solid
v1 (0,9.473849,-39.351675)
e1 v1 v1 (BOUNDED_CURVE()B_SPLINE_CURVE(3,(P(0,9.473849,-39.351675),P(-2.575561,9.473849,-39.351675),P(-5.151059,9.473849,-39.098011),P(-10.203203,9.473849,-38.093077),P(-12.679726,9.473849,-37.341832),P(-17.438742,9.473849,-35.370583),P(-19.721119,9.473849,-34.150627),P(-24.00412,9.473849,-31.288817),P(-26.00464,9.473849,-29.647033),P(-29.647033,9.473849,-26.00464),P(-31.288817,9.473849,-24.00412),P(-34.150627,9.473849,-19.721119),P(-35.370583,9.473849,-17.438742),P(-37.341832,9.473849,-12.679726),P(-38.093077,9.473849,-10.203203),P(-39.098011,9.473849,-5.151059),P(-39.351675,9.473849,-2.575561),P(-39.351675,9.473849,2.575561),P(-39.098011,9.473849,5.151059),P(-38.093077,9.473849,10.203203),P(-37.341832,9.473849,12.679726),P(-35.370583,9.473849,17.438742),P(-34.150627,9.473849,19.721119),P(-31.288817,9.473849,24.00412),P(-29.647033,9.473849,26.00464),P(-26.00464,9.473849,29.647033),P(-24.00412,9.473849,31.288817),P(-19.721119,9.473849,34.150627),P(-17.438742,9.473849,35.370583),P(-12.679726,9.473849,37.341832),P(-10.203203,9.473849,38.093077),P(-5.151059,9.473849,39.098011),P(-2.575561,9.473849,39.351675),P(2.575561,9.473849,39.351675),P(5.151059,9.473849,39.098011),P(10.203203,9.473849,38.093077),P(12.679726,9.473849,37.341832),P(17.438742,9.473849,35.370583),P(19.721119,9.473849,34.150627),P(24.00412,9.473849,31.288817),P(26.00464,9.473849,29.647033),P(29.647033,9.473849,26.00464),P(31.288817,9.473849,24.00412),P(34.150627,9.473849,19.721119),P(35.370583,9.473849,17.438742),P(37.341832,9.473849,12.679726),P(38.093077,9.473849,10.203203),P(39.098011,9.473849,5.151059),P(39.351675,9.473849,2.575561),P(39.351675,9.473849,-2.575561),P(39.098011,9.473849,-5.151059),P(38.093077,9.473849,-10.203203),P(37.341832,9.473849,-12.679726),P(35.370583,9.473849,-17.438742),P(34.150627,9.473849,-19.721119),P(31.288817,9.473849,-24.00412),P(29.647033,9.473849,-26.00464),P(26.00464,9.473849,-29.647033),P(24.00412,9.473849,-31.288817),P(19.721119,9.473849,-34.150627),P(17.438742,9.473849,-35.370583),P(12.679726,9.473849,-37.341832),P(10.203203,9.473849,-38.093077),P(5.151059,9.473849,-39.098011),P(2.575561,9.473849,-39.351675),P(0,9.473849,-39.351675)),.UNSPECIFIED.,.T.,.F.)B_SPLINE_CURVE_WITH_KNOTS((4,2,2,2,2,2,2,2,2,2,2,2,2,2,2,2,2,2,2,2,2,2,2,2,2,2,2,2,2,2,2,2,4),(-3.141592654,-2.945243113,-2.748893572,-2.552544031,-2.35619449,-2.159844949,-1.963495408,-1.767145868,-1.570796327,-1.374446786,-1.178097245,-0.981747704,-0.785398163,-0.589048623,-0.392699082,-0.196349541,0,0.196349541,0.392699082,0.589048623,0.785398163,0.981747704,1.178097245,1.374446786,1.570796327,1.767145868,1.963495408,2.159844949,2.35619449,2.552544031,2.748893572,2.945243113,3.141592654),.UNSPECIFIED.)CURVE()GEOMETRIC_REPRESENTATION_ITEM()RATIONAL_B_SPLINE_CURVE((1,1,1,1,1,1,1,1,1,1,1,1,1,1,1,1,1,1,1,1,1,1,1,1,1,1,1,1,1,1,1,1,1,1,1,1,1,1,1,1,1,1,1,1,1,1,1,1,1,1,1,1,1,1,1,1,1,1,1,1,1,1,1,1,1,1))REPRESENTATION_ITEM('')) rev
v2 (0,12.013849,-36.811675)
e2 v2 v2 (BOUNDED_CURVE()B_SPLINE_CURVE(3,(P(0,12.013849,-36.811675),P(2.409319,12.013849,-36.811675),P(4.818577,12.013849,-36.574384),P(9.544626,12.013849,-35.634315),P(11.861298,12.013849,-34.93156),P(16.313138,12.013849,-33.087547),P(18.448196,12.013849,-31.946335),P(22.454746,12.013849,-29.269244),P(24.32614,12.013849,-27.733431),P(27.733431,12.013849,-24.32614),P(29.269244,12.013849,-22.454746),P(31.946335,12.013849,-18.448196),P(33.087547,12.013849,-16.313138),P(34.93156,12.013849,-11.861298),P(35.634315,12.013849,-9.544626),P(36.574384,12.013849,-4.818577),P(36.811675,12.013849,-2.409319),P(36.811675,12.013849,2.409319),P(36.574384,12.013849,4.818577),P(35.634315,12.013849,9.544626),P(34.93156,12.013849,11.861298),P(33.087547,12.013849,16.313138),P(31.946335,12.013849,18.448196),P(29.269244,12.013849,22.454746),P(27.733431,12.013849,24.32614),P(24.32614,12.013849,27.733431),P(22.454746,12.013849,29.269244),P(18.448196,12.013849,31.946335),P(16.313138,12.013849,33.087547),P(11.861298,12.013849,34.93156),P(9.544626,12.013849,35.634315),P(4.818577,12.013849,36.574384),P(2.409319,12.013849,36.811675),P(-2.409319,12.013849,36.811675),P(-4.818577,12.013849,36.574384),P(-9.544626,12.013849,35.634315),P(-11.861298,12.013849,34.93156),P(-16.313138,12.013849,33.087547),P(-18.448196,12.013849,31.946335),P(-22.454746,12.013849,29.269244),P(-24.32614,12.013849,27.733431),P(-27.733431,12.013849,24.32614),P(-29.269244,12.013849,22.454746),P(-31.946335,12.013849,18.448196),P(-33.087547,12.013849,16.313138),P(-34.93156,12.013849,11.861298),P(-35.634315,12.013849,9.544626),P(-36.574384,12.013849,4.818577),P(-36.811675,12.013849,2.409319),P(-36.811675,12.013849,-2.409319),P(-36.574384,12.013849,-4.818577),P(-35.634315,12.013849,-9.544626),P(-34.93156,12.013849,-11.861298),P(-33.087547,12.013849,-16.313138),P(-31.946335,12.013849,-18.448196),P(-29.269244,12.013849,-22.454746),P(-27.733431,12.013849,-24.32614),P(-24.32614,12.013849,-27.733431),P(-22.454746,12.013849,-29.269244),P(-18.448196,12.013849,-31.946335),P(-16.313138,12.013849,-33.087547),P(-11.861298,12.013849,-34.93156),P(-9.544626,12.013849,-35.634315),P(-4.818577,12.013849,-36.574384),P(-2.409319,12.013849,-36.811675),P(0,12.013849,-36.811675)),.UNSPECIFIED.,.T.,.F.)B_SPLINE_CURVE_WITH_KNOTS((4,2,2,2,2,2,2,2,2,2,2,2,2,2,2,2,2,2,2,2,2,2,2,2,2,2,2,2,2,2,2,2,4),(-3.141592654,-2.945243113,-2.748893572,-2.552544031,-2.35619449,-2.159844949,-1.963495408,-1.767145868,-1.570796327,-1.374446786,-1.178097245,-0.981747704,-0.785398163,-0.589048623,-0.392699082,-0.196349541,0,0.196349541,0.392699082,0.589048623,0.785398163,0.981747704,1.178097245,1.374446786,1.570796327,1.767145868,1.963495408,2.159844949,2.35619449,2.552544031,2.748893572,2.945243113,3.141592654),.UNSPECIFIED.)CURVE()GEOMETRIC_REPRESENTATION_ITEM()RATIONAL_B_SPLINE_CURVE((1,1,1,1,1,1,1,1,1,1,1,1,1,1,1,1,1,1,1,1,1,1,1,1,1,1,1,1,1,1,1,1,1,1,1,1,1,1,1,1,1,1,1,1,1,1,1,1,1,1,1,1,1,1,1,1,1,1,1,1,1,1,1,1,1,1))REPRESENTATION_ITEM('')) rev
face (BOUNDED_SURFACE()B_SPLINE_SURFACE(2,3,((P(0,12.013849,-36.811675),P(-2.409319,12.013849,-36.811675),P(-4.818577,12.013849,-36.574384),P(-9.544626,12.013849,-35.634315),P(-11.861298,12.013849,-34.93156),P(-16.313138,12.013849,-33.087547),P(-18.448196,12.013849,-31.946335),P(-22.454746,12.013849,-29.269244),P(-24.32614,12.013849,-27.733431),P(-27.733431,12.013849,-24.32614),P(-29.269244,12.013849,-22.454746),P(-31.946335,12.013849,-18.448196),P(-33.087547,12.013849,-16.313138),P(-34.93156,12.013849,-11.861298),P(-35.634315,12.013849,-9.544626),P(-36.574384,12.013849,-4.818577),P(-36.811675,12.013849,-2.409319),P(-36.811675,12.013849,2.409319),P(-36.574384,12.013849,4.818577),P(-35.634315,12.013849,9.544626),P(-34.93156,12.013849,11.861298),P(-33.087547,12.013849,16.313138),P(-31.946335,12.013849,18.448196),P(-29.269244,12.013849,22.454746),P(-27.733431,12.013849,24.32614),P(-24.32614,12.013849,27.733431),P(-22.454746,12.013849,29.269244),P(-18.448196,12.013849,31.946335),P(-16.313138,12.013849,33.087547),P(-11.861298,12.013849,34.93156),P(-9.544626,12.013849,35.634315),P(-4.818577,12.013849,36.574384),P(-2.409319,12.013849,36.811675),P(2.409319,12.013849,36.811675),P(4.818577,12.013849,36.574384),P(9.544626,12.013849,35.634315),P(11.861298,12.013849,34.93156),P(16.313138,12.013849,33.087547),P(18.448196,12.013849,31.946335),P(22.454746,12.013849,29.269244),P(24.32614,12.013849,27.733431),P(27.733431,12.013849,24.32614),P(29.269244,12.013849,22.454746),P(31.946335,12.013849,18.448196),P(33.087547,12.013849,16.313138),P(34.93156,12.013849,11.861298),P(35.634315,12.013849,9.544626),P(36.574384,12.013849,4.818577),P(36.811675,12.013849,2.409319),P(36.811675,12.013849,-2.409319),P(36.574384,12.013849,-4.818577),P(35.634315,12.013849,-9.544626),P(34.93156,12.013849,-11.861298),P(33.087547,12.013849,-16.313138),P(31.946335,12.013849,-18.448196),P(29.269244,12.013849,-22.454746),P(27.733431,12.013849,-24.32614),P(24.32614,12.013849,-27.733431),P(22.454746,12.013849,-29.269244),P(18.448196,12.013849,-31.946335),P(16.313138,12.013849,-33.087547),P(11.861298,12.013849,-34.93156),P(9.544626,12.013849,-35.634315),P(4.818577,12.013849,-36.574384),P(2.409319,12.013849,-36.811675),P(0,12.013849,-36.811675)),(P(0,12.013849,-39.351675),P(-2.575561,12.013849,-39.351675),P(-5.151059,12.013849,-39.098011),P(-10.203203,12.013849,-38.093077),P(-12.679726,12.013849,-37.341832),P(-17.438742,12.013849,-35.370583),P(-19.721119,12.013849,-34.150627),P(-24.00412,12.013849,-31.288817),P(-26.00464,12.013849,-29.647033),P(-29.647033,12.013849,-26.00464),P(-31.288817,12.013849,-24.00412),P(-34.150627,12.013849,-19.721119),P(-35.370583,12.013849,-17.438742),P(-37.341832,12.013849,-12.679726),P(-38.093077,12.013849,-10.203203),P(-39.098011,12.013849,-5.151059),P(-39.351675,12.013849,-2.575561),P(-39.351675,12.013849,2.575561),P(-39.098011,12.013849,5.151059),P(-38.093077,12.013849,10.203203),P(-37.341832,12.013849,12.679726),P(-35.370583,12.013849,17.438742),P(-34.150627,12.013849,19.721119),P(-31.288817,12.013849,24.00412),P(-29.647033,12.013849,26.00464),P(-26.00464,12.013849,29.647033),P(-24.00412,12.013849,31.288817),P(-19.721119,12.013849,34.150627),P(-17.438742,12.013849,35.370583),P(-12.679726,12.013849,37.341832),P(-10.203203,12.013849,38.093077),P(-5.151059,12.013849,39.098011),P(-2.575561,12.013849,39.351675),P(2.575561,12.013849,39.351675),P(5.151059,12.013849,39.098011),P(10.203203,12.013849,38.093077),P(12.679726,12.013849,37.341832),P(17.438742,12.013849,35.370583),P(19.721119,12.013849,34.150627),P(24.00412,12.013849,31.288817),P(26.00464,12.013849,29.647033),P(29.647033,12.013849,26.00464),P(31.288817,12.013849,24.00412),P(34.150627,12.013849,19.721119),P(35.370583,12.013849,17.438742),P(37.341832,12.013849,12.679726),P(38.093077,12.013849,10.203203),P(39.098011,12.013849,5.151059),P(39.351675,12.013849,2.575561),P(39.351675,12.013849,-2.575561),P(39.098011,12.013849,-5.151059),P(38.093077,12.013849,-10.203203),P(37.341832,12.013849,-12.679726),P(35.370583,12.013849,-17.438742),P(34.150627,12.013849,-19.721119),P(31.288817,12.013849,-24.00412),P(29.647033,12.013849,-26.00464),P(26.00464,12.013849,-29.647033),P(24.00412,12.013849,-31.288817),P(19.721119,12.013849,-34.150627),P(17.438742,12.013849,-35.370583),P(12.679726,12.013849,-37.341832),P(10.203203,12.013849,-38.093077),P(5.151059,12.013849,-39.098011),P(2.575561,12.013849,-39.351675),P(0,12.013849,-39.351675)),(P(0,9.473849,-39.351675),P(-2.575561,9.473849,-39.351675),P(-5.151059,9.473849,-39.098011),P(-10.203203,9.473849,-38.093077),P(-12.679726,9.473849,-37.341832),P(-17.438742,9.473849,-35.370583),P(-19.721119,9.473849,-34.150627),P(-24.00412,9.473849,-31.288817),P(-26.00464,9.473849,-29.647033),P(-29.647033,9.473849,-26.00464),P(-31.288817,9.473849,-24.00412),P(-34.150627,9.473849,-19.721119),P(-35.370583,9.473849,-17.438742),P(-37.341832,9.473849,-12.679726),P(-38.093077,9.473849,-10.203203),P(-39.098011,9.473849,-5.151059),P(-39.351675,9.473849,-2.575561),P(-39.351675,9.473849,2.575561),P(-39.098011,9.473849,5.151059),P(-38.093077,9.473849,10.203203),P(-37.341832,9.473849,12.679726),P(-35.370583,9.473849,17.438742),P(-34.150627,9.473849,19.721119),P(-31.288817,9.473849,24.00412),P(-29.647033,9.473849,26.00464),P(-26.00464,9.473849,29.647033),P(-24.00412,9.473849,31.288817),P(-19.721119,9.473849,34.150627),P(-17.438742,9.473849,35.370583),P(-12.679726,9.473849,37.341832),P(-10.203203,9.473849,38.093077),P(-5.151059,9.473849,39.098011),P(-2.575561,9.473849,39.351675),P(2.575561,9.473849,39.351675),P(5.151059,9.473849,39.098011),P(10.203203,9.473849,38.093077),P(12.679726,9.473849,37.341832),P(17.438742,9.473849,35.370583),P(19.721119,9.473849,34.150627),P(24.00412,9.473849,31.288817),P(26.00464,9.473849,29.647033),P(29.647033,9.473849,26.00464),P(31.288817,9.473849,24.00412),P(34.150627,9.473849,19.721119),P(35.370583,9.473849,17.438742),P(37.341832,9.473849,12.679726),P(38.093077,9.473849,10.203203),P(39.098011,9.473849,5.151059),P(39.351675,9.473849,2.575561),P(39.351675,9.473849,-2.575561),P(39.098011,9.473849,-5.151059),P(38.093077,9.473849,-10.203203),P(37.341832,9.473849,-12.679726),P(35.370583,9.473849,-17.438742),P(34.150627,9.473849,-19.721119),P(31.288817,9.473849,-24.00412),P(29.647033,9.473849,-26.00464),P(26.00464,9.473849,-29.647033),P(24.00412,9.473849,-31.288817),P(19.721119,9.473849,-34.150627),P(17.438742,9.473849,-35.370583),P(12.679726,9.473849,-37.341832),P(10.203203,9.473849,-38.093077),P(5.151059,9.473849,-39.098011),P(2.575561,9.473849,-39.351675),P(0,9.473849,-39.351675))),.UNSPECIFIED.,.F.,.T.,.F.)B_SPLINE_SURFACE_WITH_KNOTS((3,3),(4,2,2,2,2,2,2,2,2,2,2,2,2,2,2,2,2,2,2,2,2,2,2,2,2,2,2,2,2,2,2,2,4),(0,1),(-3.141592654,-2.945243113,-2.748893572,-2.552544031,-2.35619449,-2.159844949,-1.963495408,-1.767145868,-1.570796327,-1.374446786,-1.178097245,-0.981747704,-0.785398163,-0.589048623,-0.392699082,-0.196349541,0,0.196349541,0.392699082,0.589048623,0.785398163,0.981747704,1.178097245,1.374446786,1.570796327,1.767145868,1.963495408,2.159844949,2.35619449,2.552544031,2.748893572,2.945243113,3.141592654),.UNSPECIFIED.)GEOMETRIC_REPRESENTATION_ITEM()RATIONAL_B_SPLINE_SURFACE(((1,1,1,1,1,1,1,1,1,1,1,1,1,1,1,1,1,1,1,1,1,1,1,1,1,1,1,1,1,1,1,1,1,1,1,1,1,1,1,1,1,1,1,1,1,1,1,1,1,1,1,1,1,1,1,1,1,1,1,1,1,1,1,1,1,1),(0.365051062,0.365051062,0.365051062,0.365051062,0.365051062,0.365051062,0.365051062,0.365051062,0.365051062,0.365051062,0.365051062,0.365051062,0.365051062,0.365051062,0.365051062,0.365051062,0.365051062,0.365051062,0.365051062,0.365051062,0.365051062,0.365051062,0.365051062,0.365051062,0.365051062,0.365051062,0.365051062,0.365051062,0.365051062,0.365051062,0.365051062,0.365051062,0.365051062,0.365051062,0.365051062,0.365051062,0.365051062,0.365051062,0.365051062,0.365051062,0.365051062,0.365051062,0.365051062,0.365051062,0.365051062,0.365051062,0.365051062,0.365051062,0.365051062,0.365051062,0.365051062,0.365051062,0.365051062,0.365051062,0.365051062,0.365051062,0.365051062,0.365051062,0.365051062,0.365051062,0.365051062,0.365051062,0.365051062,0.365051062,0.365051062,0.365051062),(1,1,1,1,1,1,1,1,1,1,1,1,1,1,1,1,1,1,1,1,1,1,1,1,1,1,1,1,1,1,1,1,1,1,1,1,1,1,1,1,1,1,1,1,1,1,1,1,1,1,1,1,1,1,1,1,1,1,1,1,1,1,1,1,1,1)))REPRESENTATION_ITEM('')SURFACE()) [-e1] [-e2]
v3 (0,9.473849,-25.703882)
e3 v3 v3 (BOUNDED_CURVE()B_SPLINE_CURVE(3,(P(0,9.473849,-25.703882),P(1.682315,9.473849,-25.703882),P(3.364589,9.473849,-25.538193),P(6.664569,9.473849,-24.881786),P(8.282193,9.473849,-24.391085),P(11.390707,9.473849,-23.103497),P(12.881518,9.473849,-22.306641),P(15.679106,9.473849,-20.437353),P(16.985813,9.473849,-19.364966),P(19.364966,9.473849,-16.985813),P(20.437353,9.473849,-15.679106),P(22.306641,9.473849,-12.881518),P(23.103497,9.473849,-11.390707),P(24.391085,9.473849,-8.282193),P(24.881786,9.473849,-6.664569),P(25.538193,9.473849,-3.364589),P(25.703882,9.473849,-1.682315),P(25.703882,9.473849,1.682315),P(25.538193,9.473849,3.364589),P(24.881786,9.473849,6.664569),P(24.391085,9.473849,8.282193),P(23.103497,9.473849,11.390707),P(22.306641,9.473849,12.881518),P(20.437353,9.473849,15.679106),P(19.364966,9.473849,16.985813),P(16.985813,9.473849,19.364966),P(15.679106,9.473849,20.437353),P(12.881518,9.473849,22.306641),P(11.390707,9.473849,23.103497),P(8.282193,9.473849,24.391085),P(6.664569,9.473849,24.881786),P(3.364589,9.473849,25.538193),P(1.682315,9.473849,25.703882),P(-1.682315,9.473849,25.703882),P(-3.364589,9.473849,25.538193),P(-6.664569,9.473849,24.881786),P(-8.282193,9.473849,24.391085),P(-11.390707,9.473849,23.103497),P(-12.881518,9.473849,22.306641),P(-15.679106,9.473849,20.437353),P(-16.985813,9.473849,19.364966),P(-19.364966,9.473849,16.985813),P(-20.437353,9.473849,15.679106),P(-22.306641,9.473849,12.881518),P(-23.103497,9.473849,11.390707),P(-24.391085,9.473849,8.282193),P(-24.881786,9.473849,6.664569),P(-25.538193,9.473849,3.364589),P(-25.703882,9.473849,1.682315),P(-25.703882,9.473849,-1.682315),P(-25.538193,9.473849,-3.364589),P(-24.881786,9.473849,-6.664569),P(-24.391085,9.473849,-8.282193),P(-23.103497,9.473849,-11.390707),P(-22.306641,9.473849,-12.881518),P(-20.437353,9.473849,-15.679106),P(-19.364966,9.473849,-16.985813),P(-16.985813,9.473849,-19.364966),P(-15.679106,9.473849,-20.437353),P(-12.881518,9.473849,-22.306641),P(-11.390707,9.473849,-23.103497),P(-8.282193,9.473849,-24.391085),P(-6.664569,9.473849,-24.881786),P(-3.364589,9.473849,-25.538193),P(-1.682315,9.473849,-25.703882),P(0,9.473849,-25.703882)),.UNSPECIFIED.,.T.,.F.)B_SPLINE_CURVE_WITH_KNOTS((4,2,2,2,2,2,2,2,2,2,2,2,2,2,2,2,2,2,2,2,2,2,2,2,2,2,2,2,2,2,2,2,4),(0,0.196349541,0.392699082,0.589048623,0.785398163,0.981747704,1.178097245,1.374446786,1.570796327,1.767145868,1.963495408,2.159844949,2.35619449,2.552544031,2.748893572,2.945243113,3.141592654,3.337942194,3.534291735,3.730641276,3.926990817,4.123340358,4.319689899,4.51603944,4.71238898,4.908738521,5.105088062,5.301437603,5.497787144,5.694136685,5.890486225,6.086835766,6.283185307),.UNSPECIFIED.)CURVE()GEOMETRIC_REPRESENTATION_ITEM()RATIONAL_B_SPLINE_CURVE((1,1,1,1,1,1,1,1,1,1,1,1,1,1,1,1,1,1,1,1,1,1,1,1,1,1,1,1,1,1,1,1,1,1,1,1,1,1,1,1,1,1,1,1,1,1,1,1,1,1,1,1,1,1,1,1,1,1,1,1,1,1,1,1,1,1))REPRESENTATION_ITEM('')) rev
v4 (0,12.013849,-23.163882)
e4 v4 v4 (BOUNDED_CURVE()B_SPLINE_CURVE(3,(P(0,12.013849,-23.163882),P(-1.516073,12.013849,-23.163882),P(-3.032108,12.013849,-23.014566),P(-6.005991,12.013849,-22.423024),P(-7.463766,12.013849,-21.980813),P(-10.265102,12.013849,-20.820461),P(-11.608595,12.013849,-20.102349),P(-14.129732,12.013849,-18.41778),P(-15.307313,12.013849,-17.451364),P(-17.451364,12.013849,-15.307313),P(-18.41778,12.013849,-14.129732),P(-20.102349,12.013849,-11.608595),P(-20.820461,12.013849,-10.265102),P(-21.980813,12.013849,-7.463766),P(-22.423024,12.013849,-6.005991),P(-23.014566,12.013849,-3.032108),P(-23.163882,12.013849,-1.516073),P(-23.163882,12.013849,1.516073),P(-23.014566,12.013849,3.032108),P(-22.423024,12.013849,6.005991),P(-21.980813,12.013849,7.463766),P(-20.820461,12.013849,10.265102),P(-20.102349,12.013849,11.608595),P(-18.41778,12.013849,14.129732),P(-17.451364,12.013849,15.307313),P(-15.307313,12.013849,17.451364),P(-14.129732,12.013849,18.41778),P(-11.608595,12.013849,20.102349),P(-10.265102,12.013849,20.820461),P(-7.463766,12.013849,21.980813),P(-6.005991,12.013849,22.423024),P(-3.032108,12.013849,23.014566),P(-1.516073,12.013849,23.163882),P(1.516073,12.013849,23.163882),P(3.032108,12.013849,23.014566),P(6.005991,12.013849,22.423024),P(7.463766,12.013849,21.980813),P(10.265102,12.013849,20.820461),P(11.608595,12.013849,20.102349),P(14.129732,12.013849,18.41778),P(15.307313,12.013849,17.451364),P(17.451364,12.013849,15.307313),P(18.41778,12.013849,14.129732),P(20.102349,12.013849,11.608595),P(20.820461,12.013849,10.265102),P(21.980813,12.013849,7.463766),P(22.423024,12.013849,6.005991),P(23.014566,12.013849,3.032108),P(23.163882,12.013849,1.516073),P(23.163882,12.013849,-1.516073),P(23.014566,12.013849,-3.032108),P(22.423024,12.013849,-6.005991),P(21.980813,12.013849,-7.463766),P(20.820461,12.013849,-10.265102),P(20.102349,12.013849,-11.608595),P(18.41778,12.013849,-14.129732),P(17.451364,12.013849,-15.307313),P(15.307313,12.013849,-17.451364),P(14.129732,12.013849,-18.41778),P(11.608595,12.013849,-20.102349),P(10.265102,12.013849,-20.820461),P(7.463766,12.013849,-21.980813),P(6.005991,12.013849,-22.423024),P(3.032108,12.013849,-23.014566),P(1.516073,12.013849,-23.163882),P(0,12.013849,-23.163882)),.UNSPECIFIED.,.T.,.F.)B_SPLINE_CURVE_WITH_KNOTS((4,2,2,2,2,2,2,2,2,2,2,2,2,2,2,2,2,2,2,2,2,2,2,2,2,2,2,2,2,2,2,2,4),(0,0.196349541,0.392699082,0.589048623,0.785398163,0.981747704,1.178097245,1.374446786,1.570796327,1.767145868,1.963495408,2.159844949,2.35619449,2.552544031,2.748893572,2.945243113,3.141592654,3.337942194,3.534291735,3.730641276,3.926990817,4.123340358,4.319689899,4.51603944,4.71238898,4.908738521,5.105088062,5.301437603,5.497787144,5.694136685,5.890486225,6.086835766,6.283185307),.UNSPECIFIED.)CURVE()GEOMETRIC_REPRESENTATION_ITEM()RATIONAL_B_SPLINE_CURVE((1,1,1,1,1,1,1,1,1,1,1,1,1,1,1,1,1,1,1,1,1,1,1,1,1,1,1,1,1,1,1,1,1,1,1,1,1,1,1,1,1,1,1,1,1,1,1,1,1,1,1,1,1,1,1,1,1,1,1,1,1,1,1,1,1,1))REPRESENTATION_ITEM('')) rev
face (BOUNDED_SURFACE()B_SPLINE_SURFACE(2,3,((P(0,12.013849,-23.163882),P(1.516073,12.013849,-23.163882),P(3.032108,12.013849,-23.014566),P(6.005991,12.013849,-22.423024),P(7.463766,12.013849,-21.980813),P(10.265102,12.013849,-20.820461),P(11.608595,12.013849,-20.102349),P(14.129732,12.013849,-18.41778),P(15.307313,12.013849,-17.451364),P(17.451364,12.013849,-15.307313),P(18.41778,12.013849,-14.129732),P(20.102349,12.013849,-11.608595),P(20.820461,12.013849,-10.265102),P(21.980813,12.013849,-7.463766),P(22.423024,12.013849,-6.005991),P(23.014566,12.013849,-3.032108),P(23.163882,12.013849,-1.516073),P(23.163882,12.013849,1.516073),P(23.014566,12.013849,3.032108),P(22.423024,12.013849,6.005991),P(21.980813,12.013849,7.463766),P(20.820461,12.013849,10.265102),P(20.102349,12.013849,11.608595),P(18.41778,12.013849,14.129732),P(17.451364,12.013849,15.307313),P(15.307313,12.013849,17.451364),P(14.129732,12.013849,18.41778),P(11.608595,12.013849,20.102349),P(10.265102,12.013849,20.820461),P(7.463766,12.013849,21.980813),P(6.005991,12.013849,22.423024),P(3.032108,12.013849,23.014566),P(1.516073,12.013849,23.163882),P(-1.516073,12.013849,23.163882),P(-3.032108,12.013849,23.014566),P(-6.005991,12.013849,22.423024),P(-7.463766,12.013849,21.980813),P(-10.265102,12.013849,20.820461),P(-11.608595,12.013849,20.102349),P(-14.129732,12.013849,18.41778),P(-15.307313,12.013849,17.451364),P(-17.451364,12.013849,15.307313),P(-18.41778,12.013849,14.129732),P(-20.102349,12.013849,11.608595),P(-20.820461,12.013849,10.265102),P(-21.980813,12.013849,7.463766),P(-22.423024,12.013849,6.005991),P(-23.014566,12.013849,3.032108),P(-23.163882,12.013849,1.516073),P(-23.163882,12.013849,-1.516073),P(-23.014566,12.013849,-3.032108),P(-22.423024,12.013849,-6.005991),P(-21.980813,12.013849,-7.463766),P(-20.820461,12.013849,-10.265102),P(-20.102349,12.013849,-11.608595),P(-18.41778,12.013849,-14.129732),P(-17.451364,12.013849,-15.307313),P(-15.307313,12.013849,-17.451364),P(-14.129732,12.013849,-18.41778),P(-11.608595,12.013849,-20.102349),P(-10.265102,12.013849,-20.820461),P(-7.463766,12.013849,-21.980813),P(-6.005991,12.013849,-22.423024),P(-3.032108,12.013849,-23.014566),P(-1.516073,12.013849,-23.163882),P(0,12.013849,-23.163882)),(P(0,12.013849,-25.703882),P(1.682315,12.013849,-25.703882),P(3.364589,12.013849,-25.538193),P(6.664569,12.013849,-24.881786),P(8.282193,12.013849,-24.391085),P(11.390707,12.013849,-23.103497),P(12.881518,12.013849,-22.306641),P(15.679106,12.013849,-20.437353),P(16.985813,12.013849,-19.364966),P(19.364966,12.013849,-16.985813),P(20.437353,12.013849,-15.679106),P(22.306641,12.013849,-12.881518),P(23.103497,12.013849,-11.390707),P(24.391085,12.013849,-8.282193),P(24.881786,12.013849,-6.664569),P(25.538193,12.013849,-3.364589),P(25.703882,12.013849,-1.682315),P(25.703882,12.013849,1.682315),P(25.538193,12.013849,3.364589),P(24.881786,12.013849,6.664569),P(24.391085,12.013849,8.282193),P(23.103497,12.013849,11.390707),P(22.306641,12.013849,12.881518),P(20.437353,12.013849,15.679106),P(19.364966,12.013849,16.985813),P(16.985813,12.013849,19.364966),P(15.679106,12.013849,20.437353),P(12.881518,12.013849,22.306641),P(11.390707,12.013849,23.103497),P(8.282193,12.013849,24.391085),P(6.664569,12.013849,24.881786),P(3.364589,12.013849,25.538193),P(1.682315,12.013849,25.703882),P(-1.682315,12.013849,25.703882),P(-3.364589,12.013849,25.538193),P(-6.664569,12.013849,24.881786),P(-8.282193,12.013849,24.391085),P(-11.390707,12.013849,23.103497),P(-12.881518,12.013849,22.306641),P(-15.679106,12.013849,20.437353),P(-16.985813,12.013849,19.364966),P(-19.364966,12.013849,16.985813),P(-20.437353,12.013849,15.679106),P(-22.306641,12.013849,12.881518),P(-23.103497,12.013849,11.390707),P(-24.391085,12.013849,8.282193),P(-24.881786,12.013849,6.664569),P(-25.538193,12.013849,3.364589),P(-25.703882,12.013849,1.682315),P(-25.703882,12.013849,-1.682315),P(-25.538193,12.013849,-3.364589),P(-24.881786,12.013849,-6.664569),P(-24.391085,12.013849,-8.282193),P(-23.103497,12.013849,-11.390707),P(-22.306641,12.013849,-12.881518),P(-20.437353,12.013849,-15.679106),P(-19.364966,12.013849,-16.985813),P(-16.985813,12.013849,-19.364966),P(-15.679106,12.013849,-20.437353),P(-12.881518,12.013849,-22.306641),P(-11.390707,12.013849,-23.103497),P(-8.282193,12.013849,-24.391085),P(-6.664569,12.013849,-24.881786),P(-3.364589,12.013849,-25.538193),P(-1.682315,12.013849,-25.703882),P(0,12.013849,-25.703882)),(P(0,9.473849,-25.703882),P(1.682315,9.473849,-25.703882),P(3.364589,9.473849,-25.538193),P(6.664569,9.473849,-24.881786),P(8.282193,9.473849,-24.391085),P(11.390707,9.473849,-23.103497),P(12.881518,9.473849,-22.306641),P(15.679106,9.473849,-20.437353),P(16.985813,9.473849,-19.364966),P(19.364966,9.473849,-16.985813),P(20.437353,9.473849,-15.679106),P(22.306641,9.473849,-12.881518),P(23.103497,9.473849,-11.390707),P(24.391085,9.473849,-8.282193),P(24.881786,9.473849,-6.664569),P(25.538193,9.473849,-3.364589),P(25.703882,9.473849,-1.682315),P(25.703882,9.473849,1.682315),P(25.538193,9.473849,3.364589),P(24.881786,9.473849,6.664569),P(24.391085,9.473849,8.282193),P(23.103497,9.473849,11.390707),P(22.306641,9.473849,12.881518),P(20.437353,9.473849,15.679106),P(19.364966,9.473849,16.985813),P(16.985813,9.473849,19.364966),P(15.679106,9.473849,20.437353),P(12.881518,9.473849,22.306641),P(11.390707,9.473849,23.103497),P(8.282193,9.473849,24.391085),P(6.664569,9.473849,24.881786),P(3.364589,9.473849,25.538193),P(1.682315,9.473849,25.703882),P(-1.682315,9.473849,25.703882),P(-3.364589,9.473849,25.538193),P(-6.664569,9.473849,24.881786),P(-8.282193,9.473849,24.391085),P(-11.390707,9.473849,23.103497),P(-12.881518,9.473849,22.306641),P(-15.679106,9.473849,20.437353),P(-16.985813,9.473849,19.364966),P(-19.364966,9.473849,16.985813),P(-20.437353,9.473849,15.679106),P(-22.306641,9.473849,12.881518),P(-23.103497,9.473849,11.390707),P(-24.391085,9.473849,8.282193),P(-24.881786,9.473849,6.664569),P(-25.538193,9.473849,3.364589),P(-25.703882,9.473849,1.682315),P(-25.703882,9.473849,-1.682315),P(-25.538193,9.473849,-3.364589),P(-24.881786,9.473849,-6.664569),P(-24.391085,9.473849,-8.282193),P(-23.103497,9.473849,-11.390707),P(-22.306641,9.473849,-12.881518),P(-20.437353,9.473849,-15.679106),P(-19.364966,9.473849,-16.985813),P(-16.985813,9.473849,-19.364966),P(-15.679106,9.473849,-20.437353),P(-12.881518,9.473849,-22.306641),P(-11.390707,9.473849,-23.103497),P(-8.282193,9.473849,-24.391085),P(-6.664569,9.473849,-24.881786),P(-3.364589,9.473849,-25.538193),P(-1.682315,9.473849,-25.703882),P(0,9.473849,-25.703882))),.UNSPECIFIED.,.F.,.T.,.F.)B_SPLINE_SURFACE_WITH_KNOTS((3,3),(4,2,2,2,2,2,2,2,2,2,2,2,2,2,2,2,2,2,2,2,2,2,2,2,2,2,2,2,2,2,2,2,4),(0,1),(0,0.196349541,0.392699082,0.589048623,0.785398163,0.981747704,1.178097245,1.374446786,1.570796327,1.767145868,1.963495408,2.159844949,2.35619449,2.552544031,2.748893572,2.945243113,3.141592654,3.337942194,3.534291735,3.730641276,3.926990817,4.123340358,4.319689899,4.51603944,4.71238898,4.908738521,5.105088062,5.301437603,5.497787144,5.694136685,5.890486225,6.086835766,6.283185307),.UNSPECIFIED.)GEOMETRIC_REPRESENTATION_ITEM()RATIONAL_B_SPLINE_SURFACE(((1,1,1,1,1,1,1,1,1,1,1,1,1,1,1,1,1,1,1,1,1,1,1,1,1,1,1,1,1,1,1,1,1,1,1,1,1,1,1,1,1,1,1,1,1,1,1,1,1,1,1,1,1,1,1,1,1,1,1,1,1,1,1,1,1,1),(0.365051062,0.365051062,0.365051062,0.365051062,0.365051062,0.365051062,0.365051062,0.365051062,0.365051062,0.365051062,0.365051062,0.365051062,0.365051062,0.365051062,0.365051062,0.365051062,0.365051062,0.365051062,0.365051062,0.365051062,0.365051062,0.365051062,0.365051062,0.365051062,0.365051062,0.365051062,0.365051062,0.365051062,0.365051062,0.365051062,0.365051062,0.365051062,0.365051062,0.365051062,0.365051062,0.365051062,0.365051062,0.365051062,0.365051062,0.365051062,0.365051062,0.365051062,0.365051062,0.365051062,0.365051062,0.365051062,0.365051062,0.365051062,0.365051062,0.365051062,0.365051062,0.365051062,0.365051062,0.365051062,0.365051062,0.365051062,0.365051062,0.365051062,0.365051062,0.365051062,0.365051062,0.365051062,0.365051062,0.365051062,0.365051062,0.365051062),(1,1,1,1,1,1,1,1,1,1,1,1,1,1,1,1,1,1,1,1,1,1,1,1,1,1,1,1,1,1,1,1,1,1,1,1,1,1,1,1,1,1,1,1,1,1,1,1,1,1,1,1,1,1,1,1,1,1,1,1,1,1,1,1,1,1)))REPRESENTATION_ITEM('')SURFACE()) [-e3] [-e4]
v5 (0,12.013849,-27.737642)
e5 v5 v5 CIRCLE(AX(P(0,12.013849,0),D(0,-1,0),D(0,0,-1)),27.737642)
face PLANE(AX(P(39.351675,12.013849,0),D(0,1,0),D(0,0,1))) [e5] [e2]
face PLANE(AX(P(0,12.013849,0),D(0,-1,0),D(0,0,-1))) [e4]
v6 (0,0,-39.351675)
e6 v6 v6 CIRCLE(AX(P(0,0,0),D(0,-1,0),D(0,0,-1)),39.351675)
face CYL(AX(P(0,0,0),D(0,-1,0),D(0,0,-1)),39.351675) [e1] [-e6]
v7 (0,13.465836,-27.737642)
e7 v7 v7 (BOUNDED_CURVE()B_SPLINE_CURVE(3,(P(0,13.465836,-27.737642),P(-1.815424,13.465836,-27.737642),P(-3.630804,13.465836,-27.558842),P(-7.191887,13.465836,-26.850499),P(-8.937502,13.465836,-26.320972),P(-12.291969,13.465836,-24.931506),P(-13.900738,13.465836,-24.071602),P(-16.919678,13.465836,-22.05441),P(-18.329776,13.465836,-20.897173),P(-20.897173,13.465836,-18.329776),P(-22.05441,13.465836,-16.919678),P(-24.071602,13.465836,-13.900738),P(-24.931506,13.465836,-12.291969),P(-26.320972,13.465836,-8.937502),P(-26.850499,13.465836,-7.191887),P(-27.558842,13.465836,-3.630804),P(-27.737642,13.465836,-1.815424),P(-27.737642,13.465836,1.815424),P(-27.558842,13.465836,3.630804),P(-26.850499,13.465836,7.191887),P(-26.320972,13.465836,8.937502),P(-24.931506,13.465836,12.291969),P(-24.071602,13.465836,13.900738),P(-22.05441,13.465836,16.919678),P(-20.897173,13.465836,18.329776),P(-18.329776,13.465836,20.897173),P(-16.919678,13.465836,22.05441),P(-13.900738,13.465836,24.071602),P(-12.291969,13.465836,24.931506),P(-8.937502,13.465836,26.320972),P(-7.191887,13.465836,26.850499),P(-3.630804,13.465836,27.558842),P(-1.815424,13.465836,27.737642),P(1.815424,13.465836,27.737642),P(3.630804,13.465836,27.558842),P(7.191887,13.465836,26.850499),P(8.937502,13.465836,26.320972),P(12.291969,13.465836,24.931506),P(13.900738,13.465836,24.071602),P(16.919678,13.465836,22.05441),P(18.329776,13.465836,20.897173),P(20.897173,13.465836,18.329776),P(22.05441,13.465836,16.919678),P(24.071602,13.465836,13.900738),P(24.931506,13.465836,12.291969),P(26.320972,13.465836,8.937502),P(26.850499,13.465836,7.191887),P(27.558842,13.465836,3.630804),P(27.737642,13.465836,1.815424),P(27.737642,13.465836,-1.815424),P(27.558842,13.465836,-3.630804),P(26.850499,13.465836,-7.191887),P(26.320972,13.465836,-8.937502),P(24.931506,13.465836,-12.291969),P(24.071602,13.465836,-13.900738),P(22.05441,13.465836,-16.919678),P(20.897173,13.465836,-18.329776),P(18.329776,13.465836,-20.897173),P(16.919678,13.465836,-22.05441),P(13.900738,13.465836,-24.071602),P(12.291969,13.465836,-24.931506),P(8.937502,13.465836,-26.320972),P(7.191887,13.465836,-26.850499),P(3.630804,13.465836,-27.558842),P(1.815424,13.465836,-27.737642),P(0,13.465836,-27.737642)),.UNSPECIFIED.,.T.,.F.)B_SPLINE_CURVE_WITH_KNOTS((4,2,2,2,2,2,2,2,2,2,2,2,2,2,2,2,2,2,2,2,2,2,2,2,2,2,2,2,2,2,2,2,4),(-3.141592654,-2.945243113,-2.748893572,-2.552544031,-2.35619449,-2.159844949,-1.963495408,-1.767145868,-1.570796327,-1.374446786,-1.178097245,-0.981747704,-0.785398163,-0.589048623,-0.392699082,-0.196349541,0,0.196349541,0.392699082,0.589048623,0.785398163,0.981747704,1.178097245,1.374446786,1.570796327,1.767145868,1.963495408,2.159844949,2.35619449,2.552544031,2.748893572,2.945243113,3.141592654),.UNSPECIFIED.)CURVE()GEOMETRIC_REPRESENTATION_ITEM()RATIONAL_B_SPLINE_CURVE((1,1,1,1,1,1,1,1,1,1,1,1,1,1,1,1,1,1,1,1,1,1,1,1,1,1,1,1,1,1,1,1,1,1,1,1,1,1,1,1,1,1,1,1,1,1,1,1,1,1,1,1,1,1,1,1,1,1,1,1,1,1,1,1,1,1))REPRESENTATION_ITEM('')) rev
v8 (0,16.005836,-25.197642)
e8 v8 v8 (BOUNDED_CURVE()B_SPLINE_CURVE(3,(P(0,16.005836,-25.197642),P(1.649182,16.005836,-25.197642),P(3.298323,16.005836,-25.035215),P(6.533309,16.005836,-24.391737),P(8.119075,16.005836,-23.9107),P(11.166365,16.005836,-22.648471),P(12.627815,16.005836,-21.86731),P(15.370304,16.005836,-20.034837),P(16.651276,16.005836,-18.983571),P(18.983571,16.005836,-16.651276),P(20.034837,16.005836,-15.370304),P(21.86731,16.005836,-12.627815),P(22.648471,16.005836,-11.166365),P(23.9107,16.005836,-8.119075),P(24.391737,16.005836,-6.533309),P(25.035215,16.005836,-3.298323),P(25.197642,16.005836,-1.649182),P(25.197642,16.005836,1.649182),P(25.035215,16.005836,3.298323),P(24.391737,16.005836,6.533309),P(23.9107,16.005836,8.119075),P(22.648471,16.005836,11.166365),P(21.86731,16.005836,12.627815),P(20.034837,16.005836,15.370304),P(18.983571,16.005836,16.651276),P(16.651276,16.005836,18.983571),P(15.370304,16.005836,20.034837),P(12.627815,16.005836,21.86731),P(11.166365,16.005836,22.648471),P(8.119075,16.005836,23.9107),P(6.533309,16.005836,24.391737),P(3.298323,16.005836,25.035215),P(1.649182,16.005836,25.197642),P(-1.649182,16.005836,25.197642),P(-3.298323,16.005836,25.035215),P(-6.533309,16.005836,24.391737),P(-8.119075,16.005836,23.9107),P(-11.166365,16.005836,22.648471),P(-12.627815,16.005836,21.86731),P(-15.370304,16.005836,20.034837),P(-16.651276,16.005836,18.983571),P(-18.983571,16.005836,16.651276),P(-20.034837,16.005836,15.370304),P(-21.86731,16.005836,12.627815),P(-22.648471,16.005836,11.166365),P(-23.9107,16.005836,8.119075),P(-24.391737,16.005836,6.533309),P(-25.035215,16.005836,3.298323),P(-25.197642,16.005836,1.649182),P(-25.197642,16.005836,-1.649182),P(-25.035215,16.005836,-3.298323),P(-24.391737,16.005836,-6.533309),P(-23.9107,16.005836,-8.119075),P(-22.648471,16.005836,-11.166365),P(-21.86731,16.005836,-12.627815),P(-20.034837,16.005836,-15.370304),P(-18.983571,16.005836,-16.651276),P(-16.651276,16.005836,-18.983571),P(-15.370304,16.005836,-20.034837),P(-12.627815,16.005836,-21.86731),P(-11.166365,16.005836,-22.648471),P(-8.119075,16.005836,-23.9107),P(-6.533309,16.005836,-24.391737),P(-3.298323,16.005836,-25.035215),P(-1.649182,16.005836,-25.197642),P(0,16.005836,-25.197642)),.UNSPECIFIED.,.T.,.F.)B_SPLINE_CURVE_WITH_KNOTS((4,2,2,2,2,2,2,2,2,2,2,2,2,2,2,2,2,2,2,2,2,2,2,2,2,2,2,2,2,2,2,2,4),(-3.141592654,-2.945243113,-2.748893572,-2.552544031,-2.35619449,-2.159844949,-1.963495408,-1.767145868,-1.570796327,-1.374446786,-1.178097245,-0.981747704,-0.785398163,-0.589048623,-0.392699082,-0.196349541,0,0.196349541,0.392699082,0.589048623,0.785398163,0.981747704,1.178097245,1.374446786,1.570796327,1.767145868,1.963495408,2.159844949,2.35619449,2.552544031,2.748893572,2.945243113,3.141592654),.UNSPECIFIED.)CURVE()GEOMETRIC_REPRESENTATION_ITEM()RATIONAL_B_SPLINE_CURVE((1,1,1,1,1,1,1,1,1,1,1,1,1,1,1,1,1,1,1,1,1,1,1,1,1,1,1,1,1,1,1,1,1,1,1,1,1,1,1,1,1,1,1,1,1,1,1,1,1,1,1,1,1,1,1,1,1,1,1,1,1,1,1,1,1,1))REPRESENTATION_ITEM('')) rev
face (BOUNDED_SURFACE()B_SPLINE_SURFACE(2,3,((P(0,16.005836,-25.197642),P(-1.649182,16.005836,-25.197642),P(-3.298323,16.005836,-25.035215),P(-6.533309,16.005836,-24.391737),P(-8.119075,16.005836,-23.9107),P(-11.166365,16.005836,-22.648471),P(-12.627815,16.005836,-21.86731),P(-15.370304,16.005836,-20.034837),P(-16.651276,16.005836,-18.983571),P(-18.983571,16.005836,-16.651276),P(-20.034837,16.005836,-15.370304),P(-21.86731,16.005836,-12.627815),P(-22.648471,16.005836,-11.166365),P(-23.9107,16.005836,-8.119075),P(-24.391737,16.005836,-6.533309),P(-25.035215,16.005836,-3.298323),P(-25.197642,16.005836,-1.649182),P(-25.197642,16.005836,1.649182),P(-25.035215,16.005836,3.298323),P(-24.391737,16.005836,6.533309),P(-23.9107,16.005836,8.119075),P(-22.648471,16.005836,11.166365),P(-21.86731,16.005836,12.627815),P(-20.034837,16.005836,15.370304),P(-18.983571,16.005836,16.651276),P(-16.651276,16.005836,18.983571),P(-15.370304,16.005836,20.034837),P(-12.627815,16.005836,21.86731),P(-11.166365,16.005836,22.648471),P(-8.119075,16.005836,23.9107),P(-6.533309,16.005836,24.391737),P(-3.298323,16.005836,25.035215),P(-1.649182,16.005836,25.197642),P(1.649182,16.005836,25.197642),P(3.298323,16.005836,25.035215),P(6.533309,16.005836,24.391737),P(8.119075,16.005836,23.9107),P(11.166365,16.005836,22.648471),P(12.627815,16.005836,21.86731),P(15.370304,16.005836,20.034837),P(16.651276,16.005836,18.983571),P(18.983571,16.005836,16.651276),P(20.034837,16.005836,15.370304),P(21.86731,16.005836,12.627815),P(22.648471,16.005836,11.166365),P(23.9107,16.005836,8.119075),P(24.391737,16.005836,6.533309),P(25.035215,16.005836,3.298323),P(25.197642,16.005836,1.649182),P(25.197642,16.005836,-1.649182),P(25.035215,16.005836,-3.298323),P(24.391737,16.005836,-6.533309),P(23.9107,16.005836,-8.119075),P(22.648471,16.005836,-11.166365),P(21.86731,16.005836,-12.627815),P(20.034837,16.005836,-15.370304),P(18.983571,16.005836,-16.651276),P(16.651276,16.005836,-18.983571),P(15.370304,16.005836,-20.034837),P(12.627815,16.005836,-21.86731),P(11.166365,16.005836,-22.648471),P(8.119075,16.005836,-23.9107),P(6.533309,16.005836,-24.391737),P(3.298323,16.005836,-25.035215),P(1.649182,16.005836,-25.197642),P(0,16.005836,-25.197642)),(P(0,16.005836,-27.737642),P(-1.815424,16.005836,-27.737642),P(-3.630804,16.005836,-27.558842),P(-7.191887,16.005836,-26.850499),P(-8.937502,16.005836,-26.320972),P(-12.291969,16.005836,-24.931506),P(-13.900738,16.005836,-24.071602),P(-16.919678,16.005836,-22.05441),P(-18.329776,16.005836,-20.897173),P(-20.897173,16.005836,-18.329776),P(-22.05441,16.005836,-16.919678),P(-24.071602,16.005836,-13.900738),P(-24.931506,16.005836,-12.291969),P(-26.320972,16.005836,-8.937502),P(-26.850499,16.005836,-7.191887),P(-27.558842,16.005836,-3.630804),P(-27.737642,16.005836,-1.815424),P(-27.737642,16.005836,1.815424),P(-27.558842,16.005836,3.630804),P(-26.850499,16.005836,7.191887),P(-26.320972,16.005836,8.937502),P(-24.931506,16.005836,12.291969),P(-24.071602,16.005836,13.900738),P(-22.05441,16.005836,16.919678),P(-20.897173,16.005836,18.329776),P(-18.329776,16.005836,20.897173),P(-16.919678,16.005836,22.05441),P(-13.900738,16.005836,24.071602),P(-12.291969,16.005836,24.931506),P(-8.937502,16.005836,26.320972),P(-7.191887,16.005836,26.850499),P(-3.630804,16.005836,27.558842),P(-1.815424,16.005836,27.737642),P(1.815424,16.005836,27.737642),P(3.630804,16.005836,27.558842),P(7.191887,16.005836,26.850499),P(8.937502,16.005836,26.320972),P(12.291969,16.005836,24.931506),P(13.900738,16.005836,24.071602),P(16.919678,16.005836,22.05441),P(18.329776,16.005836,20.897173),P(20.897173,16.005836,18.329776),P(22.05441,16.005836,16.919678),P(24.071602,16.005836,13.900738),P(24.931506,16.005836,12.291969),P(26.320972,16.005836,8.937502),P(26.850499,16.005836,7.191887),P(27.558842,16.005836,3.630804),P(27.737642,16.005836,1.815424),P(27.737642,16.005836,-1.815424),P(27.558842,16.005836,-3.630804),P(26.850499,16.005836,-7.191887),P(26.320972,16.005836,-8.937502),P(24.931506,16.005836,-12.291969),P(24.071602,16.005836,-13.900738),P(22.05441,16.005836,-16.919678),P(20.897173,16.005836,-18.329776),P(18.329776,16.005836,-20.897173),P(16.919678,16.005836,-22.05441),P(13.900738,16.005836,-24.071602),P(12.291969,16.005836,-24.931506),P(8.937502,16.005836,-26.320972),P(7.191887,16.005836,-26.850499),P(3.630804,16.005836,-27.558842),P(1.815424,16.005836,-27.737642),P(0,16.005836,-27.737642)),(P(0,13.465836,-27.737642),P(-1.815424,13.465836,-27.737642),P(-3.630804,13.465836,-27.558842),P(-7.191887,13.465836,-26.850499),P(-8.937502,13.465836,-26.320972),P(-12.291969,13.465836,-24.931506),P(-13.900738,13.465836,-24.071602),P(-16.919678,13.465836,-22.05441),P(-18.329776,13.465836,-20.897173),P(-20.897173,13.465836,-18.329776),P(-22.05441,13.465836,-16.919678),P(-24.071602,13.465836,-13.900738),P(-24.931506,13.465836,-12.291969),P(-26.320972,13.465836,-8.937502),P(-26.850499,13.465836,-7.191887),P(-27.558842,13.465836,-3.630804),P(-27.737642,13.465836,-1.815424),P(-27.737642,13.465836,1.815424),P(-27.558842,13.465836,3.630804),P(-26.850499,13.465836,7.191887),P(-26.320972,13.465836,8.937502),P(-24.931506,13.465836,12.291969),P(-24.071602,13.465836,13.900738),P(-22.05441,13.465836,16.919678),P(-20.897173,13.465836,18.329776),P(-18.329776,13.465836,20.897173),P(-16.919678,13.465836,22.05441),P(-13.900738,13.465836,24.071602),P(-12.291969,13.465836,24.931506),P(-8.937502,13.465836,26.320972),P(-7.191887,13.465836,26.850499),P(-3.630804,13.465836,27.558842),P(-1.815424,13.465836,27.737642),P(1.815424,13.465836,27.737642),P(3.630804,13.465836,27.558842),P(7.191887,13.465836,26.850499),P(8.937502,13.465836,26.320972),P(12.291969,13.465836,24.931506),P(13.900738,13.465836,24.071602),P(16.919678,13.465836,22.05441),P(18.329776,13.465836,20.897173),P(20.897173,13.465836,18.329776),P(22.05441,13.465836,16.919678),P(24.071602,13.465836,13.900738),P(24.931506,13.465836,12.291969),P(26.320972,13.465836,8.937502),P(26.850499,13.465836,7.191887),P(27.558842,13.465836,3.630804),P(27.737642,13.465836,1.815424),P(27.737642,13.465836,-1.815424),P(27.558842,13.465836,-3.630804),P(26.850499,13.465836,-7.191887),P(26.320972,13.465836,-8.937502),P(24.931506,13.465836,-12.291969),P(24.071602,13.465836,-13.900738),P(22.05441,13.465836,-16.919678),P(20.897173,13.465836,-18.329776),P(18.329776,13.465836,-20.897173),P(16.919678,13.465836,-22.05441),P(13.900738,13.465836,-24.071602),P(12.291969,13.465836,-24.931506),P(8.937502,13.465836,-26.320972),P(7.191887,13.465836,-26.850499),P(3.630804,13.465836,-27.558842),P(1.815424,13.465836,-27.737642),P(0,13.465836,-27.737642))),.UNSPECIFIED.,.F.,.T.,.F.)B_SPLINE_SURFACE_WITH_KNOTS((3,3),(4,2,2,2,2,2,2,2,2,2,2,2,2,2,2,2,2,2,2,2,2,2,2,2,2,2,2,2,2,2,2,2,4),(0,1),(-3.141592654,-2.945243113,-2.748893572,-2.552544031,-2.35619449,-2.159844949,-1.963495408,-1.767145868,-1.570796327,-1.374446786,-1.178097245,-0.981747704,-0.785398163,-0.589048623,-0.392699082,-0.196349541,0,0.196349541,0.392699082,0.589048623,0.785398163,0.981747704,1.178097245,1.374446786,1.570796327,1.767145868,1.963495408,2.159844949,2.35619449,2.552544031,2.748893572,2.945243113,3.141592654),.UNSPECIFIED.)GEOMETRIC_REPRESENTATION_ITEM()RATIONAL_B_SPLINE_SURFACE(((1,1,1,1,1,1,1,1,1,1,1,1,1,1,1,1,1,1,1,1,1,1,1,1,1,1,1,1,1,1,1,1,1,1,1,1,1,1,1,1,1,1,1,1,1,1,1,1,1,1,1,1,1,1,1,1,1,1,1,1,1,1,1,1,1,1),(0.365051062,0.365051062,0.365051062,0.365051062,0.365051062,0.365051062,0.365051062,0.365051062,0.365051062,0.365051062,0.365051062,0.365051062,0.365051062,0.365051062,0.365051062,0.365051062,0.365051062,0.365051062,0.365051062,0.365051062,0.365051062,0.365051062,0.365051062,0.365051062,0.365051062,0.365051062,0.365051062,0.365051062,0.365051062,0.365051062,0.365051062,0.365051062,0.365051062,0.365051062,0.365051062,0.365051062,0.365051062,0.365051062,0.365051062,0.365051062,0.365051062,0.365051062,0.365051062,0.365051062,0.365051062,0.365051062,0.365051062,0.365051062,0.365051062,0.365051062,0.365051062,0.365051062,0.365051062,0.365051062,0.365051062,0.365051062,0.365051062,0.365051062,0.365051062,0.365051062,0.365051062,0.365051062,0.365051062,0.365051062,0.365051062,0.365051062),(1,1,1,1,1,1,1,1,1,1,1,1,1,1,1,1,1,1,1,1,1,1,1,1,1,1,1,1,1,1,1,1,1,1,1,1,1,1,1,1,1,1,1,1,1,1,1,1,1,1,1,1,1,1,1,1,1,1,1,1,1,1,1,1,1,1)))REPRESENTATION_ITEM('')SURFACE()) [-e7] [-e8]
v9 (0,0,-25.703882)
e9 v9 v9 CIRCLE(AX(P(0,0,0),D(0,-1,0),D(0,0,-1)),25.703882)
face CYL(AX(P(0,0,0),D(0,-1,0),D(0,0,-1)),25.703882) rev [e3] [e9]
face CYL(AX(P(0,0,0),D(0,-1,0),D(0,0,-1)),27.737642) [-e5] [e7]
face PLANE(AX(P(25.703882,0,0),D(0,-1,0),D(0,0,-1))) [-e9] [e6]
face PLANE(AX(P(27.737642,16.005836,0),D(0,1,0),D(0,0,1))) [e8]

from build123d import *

# Parameters (mm, degrees)
FILLET1_SIZE = 2.54


with BuildPart() as part:
    # Sketch1 → Revolve1 (revolve)
    with BuildSketch(Plane.XY, mode=Mode.PRIVATE) as revolve1_sk:
        Polygon((25.703882473, 0), (39.351675245, 0), (39.351675245, 12.013848808), (27.737641542, 12.013848808), (27.737641542, 16.005835686), (0, 16.005835686), (0, 12.013848808), (25.703882473, 12.013848808), align=None)
    revolve(revolve1_sk.sketch.rotate(Axis((0, 0, 0), (0, 1, 0)), 90), axis=Axis((0, 0, 0), (0, 1, 0)))

    # Fillet1
    # a fillet whose section is not a circle: 2.54 mm, written as the material it adds along each edge
    with BuildSketch(Plane(origin=(0, 12.013848808, 0), x_dir=(0, 0, -1), z_dir=(1, 0, 0))) as fillet1_piece_1:
        with BuildLine():
            Bezier((25.703882473 - FILLET1_SIZE, 0), (25.703882473, 0), (25.703882473, -FILLET1_SIZE), weights=[1, 0.365051062, 1])
            Line((25.703882473, -FILLET1_SIZE), (25.703882473, 0))
            Line((25.703882473, 0), (25.703882473 - FILLET1_SIZE, 0))
        make_face()
    revolve(axis=Axis((0, 12.013848808, 0), (0, 1, 0)))
    # a fillet whose section is not a circle: 2.54 mm, written as the material it takes off along each edge
    with BuildSketch(Plane(origin=(0, 16.005835686, 0), x_dir=(0, 0, -1), z_dir=(1, 0, 0))) as fillet1_2_piece_1:
        with BuildLine():
            Bezier((27.737641542, -FILLET1_SIZE), (27.737641542, 0), (27.737641542 - FILLET1_SIZE, 0), weights=[1, 0.365051062, 1])
            Line((27.737641542 - FILLET1_SIZE, 0), (27.737641542, 0))
            Line((27.737641542, 0), (27.737641542, -FILLET1_SIZE))
        make_face()
    revolve(axis=Axis((0, 16.005835686, 0), (0, 1, 0)), mode=Mode.SUBTRACT)
    with BuildSketch(Plane(origin=(0, 12.013848808, 0), x_dir=(0, 0, -1), z_dir=(1, 0, 0))) as fillet1_2_piece_2:
        with BuildLine():
            Bezier((39.351675245, -FILLET1_SIZE), (39.351675245, 0), (39.351675245 - FILLET1_SIZE, 0), weights=[1, 0.365051062, 1])
            Line((39.351675245 - FILLET1_SIZE, 0), (39.351675245, 0))
            Line((39.351675245, 0), (39.351675245, -FILLET1_SIZE))
        make_face()
    revolve(axis=Axis((0, 12.013848808, 0), (0, 1, 0)), mode=Mode.SUBTRACT)


solid = part.part
